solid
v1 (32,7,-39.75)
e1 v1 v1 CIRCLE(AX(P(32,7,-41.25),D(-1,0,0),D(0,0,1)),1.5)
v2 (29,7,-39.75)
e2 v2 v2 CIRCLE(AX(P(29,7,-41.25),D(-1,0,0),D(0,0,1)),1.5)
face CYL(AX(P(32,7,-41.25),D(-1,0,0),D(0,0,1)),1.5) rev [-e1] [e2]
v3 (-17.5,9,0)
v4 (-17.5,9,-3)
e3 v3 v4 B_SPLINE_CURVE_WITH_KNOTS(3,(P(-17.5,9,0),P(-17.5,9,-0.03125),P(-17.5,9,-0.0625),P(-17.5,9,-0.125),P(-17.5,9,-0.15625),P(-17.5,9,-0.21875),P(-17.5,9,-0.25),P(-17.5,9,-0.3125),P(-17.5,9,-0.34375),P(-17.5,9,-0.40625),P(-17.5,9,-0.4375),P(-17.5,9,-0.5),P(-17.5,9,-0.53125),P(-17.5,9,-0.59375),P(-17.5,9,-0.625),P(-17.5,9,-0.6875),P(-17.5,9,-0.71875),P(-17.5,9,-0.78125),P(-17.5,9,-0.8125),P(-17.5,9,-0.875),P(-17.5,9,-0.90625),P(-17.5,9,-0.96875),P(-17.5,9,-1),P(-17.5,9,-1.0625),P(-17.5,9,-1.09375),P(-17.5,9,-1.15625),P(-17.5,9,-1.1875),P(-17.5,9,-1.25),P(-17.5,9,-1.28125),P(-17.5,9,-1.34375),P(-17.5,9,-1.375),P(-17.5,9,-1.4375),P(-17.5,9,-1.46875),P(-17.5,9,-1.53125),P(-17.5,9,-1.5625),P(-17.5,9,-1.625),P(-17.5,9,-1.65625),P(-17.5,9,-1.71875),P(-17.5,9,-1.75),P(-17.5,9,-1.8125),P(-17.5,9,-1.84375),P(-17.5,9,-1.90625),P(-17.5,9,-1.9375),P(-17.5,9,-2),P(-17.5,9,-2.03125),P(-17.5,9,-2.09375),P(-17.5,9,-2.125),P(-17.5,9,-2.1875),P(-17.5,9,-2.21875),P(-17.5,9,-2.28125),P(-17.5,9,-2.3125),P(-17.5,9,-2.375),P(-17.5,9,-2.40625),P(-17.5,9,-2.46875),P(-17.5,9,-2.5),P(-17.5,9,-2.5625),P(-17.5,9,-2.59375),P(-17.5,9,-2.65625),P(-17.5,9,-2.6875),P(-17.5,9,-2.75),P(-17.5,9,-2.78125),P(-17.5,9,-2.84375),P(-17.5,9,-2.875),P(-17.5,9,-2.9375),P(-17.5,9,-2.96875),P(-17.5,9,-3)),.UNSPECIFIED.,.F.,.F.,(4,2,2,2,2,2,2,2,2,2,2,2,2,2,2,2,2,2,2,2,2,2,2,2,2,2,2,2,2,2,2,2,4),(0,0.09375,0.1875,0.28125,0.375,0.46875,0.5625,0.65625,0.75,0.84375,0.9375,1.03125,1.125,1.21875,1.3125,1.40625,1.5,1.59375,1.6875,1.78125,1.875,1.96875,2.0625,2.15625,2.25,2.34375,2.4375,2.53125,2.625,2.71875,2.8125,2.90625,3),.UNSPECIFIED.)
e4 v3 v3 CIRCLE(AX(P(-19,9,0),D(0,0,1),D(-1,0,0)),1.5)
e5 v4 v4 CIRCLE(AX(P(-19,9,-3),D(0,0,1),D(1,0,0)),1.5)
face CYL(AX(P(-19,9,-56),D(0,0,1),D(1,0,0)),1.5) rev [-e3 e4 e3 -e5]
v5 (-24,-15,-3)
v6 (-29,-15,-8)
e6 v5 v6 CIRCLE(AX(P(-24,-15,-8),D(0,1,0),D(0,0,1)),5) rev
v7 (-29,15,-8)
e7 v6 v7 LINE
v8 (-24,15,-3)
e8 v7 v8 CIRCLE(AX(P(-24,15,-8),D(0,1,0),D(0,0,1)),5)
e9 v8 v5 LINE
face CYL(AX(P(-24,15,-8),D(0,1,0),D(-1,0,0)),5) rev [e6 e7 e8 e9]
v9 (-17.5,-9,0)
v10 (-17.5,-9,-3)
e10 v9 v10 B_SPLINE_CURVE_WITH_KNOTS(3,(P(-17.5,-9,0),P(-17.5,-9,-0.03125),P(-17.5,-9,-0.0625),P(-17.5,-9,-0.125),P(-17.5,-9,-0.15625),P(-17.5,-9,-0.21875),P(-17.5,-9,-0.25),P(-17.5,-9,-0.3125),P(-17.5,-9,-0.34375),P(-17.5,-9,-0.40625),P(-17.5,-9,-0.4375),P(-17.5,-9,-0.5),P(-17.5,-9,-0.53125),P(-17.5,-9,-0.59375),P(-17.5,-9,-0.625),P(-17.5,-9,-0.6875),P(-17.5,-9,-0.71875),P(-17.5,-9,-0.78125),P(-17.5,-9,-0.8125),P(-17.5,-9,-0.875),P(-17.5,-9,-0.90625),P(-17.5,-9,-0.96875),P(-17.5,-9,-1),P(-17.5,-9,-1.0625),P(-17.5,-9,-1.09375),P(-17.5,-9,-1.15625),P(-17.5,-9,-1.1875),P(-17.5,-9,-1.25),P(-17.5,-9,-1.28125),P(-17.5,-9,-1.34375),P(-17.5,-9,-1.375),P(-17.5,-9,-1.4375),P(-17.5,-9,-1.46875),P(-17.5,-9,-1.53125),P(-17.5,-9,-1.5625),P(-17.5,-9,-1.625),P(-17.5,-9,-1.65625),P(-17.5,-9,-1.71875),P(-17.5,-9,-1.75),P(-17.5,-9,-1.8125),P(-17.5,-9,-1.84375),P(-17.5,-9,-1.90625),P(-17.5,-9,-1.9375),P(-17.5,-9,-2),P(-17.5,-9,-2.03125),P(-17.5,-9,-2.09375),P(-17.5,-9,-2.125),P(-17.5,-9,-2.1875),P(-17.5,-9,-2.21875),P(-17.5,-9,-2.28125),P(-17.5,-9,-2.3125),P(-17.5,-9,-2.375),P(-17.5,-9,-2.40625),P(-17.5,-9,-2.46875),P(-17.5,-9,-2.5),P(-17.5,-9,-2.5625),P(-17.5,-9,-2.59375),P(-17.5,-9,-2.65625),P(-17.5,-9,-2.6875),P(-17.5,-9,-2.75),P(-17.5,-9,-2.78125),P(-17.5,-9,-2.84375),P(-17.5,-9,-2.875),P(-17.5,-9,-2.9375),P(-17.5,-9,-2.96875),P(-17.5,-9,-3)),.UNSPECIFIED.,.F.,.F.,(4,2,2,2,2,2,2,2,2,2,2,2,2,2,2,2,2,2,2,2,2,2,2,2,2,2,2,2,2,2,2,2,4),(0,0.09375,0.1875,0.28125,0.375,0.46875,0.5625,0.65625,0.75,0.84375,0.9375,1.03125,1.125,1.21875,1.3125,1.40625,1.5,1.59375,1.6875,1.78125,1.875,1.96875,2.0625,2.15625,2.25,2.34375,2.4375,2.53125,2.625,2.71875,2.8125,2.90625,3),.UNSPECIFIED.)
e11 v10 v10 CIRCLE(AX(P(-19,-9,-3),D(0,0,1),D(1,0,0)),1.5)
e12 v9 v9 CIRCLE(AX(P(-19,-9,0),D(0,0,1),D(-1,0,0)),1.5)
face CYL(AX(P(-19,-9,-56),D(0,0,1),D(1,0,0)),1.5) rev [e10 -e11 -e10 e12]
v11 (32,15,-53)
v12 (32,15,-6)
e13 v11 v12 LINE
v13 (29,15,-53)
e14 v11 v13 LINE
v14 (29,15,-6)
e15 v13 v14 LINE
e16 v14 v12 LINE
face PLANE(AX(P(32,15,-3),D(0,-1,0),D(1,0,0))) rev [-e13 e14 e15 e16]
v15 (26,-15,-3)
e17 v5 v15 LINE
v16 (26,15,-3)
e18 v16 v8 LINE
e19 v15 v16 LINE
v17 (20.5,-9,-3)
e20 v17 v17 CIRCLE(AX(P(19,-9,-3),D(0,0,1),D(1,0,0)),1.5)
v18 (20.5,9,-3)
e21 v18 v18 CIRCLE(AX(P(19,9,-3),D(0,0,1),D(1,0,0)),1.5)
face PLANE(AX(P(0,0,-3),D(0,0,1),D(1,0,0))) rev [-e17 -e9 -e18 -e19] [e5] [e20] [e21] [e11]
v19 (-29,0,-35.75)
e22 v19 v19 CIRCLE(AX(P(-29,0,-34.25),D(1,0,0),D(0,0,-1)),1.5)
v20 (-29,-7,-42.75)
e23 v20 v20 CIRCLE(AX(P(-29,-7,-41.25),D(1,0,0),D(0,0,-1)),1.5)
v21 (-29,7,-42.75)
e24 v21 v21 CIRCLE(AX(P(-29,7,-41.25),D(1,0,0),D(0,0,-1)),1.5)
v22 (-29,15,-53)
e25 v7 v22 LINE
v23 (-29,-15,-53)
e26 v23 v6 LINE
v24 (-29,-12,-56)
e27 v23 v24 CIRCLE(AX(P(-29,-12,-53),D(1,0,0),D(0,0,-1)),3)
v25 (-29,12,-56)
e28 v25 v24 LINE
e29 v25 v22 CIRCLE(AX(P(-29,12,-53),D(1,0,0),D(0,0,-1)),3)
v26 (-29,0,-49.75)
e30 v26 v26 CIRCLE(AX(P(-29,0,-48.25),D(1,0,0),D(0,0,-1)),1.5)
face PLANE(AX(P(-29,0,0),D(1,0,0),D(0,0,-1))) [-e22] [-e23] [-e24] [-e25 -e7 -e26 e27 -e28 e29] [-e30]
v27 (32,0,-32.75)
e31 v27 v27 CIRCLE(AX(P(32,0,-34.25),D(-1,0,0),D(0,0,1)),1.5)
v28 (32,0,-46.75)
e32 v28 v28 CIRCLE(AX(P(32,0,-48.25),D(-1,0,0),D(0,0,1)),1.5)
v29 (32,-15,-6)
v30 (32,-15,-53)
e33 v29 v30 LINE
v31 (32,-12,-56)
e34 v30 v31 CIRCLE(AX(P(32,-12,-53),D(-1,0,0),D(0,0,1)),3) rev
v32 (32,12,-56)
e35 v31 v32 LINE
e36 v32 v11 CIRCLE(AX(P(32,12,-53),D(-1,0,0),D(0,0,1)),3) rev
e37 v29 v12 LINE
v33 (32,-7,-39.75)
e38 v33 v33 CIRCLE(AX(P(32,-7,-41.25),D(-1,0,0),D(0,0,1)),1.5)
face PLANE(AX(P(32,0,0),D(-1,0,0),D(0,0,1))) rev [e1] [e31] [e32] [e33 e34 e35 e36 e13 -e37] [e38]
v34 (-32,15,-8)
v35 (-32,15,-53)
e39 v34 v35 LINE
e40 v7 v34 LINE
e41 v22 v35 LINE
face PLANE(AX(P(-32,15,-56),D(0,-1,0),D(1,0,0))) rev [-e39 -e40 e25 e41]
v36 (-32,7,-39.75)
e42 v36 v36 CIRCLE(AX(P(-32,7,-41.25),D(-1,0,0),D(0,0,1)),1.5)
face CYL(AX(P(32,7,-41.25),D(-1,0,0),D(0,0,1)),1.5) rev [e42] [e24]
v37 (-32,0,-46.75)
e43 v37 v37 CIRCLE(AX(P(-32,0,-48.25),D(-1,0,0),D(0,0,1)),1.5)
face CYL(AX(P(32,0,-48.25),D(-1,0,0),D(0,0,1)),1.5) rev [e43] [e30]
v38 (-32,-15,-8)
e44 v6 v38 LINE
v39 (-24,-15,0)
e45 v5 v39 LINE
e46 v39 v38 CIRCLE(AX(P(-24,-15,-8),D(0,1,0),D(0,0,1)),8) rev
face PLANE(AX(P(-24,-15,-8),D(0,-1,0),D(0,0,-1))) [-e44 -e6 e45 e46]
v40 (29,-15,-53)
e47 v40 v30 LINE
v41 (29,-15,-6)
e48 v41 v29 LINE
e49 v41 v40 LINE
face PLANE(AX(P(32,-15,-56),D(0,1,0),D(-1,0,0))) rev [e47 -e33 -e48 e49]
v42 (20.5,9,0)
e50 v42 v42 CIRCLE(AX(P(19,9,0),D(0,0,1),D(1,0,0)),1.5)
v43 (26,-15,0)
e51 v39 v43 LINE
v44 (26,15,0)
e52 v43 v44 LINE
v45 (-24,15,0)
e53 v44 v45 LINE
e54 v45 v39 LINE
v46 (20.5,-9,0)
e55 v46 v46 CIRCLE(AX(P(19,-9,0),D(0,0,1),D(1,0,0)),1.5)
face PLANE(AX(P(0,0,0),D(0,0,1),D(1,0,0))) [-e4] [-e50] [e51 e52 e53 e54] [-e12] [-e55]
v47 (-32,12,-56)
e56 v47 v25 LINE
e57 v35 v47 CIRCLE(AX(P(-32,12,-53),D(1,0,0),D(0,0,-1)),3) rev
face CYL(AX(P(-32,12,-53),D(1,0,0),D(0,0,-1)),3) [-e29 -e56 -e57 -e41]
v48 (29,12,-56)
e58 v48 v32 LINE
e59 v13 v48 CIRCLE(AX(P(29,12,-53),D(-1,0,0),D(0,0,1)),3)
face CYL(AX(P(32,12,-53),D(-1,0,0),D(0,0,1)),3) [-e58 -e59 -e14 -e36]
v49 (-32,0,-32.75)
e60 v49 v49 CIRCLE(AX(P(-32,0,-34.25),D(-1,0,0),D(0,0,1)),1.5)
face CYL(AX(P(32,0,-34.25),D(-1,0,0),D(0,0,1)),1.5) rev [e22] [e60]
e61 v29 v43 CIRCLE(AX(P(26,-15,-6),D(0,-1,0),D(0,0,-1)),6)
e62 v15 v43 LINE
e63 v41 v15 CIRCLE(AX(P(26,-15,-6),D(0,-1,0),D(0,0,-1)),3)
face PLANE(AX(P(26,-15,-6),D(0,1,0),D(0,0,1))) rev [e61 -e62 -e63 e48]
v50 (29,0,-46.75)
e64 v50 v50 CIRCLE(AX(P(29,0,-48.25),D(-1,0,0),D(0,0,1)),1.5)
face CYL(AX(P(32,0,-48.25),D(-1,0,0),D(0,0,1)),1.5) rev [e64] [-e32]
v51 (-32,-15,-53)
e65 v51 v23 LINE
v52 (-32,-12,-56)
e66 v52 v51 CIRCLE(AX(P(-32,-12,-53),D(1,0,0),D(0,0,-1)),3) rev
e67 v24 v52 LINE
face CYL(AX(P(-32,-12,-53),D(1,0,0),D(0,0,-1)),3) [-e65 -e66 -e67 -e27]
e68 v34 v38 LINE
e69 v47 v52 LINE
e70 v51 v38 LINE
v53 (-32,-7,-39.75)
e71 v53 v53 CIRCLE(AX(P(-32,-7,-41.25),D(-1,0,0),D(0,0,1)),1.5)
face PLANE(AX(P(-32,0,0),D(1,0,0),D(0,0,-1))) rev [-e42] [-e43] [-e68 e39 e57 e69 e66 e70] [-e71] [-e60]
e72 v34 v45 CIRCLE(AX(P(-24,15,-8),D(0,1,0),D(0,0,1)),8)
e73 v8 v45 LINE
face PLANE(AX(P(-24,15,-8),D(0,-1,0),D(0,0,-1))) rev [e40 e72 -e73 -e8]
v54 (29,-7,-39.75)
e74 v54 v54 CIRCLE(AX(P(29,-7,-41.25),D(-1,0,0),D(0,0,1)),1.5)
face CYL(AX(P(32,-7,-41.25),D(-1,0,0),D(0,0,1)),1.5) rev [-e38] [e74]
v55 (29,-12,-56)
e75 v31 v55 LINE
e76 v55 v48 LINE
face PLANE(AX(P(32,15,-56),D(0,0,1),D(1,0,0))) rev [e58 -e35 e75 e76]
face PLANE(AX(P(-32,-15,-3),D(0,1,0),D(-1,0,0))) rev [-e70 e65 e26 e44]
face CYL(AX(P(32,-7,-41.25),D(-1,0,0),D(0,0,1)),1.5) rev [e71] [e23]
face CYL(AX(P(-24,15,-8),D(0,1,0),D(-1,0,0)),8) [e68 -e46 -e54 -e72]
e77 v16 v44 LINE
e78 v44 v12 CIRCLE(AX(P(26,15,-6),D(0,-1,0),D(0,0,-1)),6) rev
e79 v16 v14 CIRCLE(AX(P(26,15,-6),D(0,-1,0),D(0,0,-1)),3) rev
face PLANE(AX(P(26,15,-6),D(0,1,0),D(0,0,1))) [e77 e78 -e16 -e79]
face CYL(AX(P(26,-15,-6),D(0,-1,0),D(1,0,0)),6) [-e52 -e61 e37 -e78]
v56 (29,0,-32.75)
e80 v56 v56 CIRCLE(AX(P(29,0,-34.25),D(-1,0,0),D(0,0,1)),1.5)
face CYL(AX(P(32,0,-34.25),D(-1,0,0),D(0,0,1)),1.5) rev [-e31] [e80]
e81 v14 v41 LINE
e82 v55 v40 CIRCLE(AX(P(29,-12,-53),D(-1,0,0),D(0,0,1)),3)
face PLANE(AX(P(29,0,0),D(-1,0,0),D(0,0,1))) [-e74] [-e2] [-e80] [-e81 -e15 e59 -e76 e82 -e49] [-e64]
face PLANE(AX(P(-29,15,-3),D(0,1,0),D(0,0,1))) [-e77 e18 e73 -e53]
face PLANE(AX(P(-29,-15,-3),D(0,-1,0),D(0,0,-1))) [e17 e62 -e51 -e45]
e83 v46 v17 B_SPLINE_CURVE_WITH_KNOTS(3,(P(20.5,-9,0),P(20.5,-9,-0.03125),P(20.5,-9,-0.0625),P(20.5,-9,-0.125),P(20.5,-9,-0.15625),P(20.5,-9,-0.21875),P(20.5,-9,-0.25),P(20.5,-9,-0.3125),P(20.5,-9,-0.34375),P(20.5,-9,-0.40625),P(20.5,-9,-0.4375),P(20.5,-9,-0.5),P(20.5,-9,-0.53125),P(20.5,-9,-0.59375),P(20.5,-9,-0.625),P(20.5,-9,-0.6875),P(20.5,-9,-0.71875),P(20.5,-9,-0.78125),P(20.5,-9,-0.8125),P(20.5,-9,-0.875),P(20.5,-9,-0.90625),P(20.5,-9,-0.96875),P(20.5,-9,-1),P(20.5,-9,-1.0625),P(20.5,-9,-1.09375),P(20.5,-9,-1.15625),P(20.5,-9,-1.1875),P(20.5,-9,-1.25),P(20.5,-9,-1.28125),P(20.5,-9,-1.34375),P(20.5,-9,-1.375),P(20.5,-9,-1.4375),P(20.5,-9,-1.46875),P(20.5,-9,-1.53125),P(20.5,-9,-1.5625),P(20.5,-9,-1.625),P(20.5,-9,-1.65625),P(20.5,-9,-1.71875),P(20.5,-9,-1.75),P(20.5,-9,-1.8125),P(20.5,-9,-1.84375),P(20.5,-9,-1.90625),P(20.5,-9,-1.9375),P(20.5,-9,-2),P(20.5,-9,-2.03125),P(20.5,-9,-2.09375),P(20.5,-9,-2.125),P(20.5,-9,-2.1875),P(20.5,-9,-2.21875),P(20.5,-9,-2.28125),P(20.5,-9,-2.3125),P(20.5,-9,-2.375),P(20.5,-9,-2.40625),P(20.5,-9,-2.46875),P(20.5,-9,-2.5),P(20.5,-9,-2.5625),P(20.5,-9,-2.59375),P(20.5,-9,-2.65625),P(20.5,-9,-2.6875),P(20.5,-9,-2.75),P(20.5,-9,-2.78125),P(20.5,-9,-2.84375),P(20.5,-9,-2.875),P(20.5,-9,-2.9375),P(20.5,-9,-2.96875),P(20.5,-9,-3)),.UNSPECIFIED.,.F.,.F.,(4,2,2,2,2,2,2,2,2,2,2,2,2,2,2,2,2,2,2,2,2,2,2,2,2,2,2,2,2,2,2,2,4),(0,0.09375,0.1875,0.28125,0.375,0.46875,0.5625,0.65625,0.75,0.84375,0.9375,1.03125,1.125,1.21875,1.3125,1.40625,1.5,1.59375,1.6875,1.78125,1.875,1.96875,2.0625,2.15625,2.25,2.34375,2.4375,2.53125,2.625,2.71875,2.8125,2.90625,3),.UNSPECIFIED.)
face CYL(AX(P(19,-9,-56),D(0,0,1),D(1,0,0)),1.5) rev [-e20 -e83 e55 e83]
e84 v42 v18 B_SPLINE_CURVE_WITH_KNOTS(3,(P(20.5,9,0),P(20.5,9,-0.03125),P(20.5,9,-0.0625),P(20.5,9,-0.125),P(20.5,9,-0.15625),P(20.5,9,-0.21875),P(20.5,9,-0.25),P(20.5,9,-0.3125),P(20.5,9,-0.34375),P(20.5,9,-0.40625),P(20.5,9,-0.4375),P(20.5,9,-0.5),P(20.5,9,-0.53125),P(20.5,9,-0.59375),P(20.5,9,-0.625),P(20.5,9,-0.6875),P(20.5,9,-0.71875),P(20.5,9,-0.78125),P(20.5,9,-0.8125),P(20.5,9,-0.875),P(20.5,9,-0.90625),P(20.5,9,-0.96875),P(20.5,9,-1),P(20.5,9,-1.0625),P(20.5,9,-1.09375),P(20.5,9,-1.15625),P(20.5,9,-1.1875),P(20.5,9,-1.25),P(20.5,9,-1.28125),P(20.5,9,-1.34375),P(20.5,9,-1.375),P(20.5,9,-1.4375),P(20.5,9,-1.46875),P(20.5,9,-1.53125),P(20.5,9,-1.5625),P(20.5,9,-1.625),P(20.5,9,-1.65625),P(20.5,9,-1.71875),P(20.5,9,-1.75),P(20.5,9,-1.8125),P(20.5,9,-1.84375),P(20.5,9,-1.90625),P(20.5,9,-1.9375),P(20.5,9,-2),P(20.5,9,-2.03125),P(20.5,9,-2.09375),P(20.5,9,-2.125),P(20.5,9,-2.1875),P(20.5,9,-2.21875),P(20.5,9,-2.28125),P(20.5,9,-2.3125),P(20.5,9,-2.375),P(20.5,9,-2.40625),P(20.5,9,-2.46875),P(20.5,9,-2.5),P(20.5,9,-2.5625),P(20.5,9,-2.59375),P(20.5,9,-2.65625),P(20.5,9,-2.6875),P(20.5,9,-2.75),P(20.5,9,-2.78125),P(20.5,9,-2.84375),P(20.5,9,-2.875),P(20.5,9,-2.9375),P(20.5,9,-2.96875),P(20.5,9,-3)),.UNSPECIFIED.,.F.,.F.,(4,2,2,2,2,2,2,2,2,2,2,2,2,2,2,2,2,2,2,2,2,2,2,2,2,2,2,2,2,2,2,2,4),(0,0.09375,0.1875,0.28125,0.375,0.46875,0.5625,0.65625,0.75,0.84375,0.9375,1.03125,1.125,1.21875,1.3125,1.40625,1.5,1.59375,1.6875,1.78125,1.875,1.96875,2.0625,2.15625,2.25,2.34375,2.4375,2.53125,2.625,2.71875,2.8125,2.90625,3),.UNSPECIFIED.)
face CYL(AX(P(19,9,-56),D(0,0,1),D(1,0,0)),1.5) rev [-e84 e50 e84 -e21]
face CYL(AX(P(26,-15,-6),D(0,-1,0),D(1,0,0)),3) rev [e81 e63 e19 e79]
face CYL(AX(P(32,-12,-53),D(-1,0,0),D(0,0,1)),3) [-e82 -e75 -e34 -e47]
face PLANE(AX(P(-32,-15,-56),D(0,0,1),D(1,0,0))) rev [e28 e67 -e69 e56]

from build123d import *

# Parameters (mm, degrees)
SKETCH_1_W                       = 58
SKETCH_1_H                       = 30
SM_BASE_FLANGE_2_DEPTH           = 3
SM_EDGE_FLANGE_1_STRIP_W         = 22
SM_EDGE_FLANGE_1_STRIP_H         = 3
SM_EDGE_FLANGE_1_STRIP_CUT_DEPTH = 30
SM_EDGE_FLANGE_1_DEPTH           = 30
SM_EDGE_FLANGE_2_STRIP_W         = 18
SM_EDGE_FLANGE_2_STRIP_H         = 3
SM_EDGE_FLANGE_2_STRIP_CUT_DEPTH = 30
SM_EDGE_FLANGE_2_DEPTH           = 30
FILLET_1_R                       = 3
SKETCH_14_R                      = 1.5
CUT_EXTRUDE_1_DEPTH              = 87.353922899
SKETCH_15_R                      = 1.5
CUT_EXTRUDE_2_DEPTH              = 67.219332525


# Sheet-metal steps are written as plain solids
with BuildPart() as part:
    # Sketch 1 → 基体-法兰2 (new body)
    with BuildSketch(Plane.XY):
        Rectangle(SKETCH_1_W, SKETCH_1_H)
    extrude(amount=-SM_BASE_FLANGE_2_DEPTH)

    # 边线-法兰1 strip (across the edge) → 边线-法兰1 strip cut (cut)
    with BuildSketch(Plane(origin=(-29, -15, -3), x_dir=(1, 0, 0), z_dir=(0, 1, 0))):
        with Locations((-6, -1.5)):
            Rectangle(SM_EDGE_FLANGE_1_STRIP_W, SM_EDGE_FLANGE_1_STRIP_H)
    extrude(amount=SM_EDGE_FLANGE_1_STRIP_CUT_DEPTH, mode=Mode.SUBTRACT)

    # 边线-法兰1 section (across the edge) → 边线-法兰1 (add)
    with BuildSketch(Plane(origin=(-29, -15, -3), x_dir=(1, 0, 0), z_dir=(0, 1, 0))):
        with BuildLine():
            Line((-3, 5), (-3, 53))
            Line((-3, 53), (0, 53))
            Line((0, 53), (0, 5))
            ThreePointArc((0, 5), (1.464466094, 1.464466094), (5, 0))
            Line((5, 0), (5, -3))
            ThreePointArc((5, -3), (-0.656854249, -0.656854249), (-3, 5))
        make_face()
    extrude(amount=SM_EDGE_FLANGE_1_DEPTH)

    # 边线-法兰2 strip (across the edge) → 边线-法兰2 strip cut (cut)
    with BuildSketch(Plane(origin=(29, 15, -3), x_dir=(-1, 0, 0), z_dir=(0, -1, 0))):
        with Locations((-6, -1.5)):
            Rectangle(SM_EDGE_FLANGE_2_STRIP_W, SM_EDGE_FLANGE_2_STRIP_H)
    extrude(amount=SM_EDGE_FLANGE_2_STRIP_CUT_DEPTH, mode=Mode.SUBTRACT)

    # 边线-法兰2 section (across the edge) → 边线-法兰2 (add)
    with BuildSketch(Plane(origin=(29, 15, -3), x_dir=(-1, 0, 0), z_dir=(0, -1, 0))):
        with BuildLine():
            Line((-3, 3), (-3, 53))
            Line((-3, 53), (0, 53))
            Line((0, 53), (0, 3))
            ThreePointArc((0, 3), (0.878679656, 0.878679656), (3, 0))
            Line((3, 0), (3, -3))
            ThreePointArc((3, -3), (-1.242640687, -1.242640687), (-3, 3))
        make_face()
    extrude(amount=SM_EDGE_FLANGE_2_DEPTH)

    # 圆角1
    fillet_1_edges = [part.edges().sort_by_distance(p)[0] for p in [
        (-30.5, -15, -56),
        (-30.5, 15, -56),
        (30.5, 15, -56),
        (30.5, -15, -56),
    ]]
    fillet(fillet_1_edges, radius=FILLET_1_R)

    # 草图14 → 切除-拉伸1 (cut, through all)
    with BuildSketch(Plane.ZY.offset(32)):
        with Locations((-34.25, 0)):
            Circle(SKETCH_14_R)
        with Locations((-41.25, 7)):
            Circle(SKETCH_14_R)
        with Locations((-48.25, 0)):
            Circle(SKETCH_14_R)
        with Locations((-41.25, -7)):
            Circle(SKETCH_14_R)
    extrude(amount=-CUT_EXTRUDE_1_DEPTH, mode=Mode.SUBTRACT)

    # 草图15 → 切除-拉伸2 (cut, through all)
    with BuildSketch(Plane.XY):
        with Locations((19, 9)):
            Circle(SKETCH_15_R)
        with Locations((19, -9)):
            Circle(SKETCH_15_R)
        with Locations((-19, -9)):
            Circle(SKETCH_15_R)
        with Locations((-19, 9)):
            Circle(SKETCH_15_R)
    extrude(amount=-CUT_EXTRUDE_2_DEPTH, mode=Mode.SUBTRACT)


solid = part.part
